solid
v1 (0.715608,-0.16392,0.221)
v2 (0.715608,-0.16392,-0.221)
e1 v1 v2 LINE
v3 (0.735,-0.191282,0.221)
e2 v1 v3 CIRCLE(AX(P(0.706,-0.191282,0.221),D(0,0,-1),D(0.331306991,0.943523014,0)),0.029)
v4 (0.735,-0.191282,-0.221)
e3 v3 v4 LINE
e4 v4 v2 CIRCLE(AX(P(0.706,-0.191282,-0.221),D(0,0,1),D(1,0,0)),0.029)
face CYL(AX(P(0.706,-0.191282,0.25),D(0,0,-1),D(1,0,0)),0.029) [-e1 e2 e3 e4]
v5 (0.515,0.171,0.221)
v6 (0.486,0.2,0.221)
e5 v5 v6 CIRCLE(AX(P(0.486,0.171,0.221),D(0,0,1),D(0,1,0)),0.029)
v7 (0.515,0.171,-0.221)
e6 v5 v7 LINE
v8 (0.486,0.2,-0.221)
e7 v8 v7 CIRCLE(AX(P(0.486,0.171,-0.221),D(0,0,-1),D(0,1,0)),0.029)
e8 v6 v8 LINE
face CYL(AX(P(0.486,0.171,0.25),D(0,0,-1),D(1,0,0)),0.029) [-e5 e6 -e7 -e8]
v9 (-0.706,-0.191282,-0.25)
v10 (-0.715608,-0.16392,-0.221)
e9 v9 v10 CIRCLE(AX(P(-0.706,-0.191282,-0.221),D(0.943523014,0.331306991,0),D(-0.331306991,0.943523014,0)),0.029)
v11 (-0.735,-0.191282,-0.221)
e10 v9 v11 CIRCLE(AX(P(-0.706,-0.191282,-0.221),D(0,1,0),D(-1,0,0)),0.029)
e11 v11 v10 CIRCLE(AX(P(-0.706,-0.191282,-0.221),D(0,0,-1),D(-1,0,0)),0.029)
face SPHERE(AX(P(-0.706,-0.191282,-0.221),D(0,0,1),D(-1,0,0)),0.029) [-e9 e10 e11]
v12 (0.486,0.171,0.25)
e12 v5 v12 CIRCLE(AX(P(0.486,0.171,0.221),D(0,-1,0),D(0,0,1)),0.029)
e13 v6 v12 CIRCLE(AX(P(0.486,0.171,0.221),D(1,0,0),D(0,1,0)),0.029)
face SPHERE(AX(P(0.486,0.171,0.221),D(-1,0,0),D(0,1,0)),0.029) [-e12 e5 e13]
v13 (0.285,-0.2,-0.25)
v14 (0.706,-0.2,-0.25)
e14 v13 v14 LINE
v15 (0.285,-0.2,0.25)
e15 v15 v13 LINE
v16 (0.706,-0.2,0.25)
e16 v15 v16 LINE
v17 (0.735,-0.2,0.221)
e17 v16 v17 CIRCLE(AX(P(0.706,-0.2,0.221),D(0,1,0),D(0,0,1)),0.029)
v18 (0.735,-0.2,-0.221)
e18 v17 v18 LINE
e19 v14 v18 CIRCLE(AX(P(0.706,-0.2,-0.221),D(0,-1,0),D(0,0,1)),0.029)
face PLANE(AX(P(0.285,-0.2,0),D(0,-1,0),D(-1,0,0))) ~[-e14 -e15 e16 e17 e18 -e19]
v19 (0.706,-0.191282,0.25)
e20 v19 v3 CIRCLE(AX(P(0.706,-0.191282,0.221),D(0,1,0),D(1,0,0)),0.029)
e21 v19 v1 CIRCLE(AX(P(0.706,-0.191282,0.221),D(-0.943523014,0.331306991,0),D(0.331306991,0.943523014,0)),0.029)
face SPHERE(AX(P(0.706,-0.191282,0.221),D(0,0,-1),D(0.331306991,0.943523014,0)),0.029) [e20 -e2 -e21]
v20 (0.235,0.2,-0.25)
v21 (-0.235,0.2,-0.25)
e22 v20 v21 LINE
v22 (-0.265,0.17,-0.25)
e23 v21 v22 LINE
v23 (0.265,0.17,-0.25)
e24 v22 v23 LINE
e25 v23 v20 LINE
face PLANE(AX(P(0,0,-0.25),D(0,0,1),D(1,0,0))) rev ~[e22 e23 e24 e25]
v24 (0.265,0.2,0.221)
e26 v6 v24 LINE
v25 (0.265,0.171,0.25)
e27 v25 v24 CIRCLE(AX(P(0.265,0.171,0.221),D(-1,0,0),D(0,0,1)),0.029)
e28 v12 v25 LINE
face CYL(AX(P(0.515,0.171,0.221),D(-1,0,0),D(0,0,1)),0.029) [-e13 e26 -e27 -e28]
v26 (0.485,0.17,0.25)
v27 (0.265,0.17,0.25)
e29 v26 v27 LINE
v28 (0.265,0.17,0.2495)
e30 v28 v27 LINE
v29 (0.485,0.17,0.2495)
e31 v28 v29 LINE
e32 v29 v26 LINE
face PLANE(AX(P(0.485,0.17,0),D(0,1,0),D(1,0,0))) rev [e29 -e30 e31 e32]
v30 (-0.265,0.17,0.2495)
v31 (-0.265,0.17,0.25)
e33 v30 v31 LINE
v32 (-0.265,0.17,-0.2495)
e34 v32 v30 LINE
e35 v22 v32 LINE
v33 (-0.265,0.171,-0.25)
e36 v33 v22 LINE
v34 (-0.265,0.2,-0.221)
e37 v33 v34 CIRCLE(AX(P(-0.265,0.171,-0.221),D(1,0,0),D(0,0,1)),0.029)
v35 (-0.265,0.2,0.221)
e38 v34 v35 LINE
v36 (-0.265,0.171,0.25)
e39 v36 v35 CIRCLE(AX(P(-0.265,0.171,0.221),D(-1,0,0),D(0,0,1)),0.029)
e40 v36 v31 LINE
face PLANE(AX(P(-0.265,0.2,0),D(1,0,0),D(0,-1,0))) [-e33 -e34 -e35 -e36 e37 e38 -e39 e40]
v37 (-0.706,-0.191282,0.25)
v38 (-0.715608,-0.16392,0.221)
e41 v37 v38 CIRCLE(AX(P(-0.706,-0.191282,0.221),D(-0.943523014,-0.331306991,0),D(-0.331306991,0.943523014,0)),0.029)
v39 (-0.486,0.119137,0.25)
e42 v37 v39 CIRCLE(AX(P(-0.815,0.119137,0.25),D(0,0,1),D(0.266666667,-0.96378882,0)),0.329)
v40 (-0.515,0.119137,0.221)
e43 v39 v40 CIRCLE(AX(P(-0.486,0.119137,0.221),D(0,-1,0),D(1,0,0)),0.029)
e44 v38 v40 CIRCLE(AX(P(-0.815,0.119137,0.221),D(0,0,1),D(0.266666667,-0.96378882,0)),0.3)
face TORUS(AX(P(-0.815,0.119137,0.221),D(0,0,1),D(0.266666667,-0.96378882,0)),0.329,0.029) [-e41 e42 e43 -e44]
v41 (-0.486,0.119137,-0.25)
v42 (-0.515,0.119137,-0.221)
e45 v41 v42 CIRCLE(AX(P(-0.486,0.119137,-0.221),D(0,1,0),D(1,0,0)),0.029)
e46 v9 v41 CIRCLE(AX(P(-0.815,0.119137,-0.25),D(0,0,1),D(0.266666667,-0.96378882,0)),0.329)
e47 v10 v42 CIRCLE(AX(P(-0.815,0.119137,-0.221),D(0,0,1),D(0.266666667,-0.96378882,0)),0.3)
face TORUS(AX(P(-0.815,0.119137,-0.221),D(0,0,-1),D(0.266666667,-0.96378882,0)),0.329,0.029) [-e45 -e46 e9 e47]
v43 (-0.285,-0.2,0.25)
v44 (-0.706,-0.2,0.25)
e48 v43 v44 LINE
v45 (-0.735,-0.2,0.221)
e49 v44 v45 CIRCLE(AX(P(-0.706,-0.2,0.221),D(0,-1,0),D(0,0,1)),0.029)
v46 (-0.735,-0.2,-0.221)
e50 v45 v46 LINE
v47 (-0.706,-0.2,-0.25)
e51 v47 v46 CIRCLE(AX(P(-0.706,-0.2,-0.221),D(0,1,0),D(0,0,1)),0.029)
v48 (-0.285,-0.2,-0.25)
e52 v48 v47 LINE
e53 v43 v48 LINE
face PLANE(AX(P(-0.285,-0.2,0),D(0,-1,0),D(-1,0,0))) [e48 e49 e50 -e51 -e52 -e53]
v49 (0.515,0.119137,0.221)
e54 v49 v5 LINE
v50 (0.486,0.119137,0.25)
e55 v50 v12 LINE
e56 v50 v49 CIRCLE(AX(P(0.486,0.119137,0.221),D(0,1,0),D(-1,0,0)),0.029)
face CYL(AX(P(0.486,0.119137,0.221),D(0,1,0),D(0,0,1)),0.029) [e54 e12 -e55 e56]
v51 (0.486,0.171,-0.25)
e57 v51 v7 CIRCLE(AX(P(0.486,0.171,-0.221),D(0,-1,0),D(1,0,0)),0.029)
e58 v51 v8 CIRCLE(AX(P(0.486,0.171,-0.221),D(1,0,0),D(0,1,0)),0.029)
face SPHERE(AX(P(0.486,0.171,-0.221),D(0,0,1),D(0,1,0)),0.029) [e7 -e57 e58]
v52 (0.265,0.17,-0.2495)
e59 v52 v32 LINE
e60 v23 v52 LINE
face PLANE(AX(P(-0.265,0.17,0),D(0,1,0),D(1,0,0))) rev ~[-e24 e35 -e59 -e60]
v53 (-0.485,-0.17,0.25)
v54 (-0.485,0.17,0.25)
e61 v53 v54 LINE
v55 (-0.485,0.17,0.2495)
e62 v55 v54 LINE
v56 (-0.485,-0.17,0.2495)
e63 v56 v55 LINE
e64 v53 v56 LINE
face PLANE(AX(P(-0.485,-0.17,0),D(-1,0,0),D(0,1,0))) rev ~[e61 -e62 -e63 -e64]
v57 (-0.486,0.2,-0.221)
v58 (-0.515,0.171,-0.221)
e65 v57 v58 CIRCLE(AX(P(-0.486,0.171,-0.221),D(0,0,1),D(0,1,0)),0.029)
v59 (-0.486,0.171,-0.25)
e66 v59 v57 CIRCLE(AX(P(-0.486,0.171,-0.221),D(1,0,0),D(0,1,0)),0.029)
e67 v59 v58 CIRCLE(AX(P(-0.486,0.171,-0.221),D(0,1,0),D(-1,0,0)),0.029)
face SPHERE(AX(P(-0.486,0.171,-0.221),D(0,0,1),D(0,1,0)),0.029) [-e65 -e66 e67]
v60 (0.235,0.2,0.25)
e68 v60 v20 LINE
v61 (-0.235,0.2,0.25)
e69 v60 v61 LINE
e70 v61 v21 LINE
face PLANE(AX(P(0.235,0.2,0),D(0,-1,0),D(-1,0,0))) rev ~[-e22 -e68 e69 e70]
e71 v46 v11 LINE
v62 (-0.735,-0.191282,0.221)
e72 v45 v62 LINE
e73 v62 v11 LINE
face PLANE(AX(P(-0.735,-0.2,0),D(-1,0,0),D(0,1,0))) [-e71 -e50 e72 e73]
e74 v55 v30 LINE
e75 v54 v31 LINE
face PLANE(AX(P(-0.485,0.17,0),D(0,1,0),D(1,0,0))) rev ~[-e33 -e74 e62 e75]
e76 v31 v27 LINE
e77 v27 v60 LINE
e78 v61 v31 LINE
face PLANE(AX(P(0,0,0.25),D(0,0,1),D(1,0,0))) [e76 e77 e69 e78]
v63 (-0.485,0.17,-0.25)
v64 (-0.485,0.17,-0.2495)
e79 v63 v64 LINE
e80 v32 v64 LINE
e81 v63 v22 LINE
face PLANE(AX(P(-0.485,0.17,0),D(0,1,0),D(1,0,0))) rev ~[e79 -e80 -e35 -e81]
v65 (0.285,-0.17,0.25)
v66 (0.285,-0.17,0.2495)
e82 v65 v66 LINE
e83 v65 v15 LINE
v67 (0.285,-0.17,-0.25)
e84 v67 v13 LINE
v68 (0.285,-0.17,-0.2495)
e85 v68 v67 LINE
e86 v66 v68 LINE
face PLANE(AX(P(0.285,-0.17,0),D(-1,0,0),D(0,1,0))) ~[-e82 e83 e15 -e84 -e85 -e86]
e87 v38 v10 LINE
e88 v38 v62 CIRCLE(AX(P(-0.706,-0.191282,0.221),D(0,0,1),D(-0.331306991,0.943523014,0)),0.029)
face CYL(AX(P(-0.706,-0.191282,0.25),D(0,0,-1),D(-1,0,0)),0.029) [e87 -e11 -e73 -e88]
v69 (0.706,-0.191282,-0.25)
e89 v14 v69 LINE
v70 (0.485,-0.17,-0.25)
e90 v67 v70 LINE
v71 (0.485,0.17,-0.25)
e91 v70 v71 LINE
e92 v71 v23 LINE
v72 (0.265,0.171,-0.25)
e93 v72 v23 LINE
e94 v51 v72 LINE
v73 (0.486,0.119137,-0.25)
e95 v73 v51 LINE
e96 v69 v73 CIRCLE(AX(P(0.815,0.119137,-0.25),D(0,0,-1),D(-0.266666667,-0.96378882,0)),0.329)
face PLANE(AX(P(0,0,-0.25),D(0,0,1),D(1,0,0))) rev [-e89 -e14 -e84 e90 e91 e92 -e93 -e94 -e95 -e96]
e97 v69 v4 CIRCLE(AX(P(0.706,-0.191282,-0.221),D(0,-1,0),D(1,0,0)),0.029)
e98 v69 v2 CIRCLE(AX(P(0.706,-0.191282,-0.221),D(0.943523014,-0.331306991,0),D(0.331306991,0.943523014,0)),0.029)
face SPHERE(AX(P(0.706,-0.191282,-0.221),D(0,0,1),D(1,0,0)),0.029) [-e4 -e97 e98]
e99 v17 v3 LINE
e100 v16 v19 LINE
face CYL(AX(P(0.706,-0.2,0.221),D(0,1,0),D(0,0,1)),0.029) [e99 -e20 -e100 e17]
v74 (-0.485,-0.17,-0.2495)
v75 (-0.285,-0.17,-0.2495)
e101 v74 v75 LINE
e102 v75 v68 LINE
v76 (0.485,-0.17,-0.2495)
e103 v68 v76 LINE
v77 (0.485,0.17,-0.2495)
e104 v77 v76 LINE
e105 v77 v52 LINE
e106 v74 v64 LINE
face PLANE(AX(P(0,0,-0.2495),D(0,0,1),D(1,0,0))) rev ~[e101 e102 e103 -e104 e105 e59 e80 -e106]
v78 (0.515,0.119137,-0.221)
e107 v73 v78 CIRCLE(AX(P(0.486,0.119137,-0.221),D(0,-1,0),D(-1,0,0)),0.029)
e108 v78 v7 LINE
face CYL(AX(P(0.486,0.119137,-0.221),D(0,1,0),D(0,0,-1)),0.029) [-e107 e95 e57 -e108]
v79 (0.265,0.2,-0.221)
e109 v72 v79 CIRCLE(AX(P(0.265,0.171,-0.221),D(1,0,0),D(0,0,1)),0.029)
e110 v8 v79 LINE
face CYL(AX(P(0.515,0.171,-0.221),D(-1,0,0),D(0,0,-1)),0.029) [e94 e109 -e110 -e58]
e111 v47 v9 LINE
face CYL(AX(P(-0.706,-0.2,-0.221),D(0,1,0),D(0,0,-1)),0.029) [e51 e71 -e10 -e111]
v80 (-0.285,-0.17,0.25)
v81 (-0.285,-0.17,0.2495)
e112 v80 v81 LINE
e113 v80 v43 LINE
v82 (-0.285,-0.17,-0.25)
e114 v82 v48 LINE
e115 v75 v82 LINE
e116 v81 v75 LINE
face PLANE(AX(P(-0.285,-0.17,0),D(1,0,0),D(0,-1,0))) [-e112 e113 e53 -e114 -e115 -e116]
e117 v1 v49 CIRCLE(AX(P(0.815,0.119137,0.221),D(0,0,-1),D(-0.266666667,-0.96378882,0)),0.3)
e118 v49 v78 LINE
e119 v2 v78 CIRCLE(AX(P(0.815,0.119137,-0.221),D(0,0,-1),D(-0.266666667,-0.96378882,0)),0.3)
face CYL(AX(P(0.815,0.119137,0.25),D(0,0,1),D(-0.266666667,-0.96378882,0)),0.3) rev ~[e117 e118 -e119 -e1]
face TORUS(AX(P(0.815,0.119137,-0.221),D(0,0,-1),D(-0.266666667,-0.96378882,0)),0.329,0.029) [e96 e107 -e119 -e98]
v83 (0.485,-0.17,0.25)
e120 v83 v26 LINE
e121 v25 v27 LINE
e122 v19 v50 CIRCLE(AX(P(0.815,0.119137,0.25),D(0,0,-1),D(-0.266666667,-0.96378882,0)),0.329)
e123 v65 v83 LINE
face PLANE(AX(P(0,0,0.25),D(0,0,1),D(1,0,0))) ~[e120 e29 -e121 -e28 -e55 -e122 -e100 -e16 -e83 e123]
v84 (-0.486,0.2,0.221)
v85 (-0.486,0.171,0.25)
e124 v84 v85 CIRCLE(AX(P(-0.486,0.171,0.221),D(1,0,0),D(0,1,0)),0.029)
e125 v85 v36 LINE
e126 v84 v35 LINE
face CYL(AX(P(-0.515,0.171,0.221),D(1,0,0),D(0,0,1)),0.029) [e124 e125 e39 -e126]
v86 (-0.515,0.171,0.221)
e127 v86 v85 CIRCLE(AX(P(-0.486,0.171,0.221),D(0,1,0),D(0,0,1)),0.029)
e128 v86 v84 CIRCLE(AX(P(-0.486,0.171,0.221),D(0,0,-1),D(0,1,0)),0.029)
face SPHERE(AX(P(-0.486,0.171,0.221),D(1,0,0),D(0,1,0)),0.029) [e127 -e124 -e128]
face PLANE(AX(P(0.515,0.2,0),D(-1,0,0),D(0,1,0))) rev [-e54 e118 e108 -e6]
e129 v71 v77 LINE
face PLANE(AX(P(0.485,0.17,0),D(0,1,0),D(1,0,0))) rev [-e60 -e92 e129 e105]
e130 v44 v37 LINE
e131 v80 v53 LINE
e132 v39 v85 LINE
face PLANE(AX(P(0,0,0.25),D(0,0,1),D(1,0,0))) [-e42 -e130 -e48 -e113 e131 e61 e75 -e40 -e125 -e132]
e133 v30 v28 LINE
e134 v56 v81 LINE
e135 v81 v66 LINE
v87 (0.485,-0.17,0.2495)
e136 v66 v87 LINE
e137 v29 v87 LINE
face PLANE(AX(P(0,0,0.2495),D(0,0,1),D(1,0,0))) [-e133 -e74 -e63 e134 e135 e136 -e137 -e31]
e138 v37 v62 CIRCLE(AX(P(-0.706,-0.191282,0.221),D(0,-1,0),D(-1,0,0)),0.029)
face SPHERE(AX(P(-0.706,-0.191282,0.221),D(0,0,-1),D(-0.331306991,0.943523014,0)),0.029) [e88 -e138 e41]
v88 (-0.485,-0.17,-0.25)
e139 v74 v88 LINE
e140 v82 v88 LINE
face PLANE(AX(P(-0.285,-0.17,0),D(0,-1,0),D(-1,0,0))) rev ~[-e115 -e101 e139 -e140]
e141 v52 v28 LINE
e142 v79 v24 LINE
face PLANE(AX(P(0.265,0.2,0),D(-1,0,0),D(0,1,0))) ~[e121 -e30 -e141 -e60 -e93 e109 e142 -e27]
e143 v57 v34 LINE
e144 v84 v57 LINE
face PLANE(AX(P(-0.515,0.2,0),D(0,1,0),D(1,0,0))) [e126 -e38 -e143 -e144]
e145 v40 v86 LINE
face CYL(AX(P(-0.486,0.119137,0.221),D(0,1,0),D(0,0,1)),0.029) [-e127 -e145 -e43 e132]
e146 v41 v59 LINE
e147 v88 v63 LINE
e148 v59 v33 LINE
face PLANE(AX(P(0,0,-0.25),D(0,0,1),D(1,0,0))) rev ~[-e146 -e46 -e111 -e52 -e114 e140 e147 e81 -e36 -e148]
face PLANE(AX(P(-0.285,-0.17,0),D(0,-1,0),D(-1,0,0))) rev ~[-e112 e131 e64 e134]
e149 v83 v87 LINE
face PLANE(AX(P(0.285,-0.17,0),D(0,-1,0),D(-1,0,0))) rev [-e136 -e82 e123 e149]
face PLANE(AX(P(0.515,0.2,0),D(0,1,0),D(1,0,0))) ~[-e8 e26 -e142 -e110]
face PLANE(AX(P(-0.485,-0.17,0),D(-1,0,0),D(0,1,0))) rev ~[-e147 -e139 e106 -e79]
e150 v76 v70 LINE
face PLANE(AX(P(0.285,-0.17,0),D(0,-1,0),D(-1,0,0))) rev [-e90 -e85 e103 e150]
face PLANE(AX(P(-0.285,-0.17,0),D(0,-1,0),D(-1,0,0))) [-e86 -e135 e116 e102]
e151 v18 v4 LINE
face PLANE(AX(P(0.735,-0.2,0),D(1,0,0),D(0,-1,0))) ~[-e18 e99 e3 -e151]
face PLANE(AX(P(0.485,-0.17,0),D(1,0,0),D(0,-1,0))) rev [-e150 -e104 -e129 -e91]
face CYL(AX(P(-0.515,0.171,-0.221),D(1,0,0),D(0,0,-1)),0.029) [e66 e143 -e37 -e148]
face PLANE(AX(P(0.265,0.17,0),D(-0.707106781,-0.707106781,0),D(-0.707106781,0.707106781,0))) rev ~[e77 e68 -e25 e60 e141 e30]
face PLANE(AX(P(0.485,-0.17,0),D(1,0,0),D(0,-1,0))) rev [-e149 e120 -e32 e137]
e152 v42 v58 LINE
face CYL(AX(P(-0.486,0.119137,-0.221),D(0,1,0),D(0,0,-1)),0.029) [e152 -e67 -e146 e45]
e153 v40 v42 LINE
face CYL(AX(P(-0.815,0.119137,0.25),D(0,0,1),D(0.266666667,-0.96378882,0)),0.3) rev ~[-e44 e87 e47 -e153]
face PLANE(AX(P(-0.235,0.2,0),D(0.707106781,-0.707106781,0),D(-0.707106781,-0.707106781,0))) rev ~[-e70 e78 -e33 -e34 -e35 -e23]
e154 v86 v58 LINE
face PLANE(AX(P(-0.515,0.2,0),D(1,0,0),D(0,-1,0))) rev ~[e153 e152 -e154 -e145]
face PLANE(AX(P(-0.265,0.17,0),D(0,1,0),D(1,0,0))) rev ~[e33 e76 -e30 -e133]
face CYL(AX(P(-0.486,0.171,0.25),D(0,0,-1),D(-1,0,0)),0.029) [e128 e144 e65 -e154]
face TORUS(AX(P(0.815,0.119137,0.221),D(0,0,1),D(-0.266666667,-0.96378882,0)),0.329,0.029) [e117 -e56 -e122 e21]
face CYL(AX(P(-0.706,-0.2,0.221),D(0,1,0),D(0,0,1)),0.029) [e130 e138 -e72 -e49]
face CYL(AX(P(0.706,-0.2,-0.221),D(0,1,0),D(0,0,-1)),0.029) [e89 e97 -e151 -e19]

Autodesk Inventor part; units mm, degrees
ref_plane "YZ Plane" through (0, 0, 0) normal (1, 0, 0) x (0, 1, 0)
ref_plane "XZ Plane" through (0, 0, 0) normal (0, 1, 0) x (-1, 0, 0)
ref_plane "XY Plane" through (0, 0, 0) normal (0, 0, 1) x (1, 0, 0)
sketch "Sketch10" plane through (0, 0, 0) normal (0, 0, 1) x (1, 0, 0)
  line L0 (-0.485, 0.17) -> (0.485, 0.17)
  line L1 (0.485, 0.17) -> (0.485, -0.17)
  line L2 (0.485, -0.17) -> (-0.485, -0.17)
  line L3 (-0.485, -0.17) -> (-0.485, 0.17)
  line L4 (-0.265, 0.17) -> (-0.485, 0.17)
  line L5 (-0.515, 0.2) -> (-0.265, 0.2)
  line L6 (-0.265, 0.2) -> (-0.265, 0.17)
  line L7 (-0.515, 0.2) -> (-0.515, -0.17)
  line L8 (-0.485, -0.17) -> (-0.485, 0.17)
  line L9 (-0.285, -0.17) -> (-0.285, -0.2)
  line L10 (-0.285, -0.2) -> (-0.735, -0.2)
  line L11 (-0.735, -0.2) -> (-0.735, -0.17)
  line L12 (-0.735, -0.17) -> (-0.515, -0.17)
  line L13 (-0.485, -0.17) -> (-0.285, -0.17)
  line L14 (-0.265, 0.17) -> (0.265, 0.17)
  line L15 (0.265, 0.17) -> (0.235, 0.2)
  line L16 (0.235, 0.2) -> (-0.235, 0.2)
  line L17 (-0.235, 0.2) -> (-0.265, 0.17)
  point P0 (0, 0)
  point P1 (0, 0.17)
  point P2 (-0.485, 0)
  point P3 (0, 0.2)
  dimension "d11" = 0.2
  dimension "d12" = 0.45
  dimension "d13" = 0.03
  dimension "d14" = 0.03
  dimension "d15" = 0.25
  dimension "d16" = 45
  dimension "d19" = 0.03
  dimension "d21" = 1
  dimension "d22" = 0.4
extrude "Extrusion4" add sketch "Sketch10" along normal mid plane 0.499 contours L0 L1 L2 L3
extrude "Extrusion5" add sketch "Sketch10" along normal mid plane 0.5 contours L3 L2 L9 L10 L11 L12 L7 L5 L6 L0 | L17 L16 L15 L0
fillet "Fillet2" radius 0.3 1 edges at (-0.515, -0.17, 0)
fillet "Fillet3" radius 0.029 10 edges at (-0.39, 0.2, 0.25) (-0.515, 0.2, 0) (-0.39, 0.2, -0.25) (-0.5763, -0.0625, -0.25) (-0.515, 0.1596, -0.25) (-0.5763, -0.0625, 0.25) (-0.515, 0.1596, 0.25) (-0.735, -0.185, 0.25) (-0.735, -0.17, 0) (-0.735, -0.185, -0.25)
mirror "Mirror1" about plane through (0, 0, 0) normal (1, 0, 0) of "Extrusion5", "Fillet2", "Fillet3"
equation "\"d14\" = d13"
equation "\"d19\" = d13"
properties part number "RC0402FR-071KL Resistor"
